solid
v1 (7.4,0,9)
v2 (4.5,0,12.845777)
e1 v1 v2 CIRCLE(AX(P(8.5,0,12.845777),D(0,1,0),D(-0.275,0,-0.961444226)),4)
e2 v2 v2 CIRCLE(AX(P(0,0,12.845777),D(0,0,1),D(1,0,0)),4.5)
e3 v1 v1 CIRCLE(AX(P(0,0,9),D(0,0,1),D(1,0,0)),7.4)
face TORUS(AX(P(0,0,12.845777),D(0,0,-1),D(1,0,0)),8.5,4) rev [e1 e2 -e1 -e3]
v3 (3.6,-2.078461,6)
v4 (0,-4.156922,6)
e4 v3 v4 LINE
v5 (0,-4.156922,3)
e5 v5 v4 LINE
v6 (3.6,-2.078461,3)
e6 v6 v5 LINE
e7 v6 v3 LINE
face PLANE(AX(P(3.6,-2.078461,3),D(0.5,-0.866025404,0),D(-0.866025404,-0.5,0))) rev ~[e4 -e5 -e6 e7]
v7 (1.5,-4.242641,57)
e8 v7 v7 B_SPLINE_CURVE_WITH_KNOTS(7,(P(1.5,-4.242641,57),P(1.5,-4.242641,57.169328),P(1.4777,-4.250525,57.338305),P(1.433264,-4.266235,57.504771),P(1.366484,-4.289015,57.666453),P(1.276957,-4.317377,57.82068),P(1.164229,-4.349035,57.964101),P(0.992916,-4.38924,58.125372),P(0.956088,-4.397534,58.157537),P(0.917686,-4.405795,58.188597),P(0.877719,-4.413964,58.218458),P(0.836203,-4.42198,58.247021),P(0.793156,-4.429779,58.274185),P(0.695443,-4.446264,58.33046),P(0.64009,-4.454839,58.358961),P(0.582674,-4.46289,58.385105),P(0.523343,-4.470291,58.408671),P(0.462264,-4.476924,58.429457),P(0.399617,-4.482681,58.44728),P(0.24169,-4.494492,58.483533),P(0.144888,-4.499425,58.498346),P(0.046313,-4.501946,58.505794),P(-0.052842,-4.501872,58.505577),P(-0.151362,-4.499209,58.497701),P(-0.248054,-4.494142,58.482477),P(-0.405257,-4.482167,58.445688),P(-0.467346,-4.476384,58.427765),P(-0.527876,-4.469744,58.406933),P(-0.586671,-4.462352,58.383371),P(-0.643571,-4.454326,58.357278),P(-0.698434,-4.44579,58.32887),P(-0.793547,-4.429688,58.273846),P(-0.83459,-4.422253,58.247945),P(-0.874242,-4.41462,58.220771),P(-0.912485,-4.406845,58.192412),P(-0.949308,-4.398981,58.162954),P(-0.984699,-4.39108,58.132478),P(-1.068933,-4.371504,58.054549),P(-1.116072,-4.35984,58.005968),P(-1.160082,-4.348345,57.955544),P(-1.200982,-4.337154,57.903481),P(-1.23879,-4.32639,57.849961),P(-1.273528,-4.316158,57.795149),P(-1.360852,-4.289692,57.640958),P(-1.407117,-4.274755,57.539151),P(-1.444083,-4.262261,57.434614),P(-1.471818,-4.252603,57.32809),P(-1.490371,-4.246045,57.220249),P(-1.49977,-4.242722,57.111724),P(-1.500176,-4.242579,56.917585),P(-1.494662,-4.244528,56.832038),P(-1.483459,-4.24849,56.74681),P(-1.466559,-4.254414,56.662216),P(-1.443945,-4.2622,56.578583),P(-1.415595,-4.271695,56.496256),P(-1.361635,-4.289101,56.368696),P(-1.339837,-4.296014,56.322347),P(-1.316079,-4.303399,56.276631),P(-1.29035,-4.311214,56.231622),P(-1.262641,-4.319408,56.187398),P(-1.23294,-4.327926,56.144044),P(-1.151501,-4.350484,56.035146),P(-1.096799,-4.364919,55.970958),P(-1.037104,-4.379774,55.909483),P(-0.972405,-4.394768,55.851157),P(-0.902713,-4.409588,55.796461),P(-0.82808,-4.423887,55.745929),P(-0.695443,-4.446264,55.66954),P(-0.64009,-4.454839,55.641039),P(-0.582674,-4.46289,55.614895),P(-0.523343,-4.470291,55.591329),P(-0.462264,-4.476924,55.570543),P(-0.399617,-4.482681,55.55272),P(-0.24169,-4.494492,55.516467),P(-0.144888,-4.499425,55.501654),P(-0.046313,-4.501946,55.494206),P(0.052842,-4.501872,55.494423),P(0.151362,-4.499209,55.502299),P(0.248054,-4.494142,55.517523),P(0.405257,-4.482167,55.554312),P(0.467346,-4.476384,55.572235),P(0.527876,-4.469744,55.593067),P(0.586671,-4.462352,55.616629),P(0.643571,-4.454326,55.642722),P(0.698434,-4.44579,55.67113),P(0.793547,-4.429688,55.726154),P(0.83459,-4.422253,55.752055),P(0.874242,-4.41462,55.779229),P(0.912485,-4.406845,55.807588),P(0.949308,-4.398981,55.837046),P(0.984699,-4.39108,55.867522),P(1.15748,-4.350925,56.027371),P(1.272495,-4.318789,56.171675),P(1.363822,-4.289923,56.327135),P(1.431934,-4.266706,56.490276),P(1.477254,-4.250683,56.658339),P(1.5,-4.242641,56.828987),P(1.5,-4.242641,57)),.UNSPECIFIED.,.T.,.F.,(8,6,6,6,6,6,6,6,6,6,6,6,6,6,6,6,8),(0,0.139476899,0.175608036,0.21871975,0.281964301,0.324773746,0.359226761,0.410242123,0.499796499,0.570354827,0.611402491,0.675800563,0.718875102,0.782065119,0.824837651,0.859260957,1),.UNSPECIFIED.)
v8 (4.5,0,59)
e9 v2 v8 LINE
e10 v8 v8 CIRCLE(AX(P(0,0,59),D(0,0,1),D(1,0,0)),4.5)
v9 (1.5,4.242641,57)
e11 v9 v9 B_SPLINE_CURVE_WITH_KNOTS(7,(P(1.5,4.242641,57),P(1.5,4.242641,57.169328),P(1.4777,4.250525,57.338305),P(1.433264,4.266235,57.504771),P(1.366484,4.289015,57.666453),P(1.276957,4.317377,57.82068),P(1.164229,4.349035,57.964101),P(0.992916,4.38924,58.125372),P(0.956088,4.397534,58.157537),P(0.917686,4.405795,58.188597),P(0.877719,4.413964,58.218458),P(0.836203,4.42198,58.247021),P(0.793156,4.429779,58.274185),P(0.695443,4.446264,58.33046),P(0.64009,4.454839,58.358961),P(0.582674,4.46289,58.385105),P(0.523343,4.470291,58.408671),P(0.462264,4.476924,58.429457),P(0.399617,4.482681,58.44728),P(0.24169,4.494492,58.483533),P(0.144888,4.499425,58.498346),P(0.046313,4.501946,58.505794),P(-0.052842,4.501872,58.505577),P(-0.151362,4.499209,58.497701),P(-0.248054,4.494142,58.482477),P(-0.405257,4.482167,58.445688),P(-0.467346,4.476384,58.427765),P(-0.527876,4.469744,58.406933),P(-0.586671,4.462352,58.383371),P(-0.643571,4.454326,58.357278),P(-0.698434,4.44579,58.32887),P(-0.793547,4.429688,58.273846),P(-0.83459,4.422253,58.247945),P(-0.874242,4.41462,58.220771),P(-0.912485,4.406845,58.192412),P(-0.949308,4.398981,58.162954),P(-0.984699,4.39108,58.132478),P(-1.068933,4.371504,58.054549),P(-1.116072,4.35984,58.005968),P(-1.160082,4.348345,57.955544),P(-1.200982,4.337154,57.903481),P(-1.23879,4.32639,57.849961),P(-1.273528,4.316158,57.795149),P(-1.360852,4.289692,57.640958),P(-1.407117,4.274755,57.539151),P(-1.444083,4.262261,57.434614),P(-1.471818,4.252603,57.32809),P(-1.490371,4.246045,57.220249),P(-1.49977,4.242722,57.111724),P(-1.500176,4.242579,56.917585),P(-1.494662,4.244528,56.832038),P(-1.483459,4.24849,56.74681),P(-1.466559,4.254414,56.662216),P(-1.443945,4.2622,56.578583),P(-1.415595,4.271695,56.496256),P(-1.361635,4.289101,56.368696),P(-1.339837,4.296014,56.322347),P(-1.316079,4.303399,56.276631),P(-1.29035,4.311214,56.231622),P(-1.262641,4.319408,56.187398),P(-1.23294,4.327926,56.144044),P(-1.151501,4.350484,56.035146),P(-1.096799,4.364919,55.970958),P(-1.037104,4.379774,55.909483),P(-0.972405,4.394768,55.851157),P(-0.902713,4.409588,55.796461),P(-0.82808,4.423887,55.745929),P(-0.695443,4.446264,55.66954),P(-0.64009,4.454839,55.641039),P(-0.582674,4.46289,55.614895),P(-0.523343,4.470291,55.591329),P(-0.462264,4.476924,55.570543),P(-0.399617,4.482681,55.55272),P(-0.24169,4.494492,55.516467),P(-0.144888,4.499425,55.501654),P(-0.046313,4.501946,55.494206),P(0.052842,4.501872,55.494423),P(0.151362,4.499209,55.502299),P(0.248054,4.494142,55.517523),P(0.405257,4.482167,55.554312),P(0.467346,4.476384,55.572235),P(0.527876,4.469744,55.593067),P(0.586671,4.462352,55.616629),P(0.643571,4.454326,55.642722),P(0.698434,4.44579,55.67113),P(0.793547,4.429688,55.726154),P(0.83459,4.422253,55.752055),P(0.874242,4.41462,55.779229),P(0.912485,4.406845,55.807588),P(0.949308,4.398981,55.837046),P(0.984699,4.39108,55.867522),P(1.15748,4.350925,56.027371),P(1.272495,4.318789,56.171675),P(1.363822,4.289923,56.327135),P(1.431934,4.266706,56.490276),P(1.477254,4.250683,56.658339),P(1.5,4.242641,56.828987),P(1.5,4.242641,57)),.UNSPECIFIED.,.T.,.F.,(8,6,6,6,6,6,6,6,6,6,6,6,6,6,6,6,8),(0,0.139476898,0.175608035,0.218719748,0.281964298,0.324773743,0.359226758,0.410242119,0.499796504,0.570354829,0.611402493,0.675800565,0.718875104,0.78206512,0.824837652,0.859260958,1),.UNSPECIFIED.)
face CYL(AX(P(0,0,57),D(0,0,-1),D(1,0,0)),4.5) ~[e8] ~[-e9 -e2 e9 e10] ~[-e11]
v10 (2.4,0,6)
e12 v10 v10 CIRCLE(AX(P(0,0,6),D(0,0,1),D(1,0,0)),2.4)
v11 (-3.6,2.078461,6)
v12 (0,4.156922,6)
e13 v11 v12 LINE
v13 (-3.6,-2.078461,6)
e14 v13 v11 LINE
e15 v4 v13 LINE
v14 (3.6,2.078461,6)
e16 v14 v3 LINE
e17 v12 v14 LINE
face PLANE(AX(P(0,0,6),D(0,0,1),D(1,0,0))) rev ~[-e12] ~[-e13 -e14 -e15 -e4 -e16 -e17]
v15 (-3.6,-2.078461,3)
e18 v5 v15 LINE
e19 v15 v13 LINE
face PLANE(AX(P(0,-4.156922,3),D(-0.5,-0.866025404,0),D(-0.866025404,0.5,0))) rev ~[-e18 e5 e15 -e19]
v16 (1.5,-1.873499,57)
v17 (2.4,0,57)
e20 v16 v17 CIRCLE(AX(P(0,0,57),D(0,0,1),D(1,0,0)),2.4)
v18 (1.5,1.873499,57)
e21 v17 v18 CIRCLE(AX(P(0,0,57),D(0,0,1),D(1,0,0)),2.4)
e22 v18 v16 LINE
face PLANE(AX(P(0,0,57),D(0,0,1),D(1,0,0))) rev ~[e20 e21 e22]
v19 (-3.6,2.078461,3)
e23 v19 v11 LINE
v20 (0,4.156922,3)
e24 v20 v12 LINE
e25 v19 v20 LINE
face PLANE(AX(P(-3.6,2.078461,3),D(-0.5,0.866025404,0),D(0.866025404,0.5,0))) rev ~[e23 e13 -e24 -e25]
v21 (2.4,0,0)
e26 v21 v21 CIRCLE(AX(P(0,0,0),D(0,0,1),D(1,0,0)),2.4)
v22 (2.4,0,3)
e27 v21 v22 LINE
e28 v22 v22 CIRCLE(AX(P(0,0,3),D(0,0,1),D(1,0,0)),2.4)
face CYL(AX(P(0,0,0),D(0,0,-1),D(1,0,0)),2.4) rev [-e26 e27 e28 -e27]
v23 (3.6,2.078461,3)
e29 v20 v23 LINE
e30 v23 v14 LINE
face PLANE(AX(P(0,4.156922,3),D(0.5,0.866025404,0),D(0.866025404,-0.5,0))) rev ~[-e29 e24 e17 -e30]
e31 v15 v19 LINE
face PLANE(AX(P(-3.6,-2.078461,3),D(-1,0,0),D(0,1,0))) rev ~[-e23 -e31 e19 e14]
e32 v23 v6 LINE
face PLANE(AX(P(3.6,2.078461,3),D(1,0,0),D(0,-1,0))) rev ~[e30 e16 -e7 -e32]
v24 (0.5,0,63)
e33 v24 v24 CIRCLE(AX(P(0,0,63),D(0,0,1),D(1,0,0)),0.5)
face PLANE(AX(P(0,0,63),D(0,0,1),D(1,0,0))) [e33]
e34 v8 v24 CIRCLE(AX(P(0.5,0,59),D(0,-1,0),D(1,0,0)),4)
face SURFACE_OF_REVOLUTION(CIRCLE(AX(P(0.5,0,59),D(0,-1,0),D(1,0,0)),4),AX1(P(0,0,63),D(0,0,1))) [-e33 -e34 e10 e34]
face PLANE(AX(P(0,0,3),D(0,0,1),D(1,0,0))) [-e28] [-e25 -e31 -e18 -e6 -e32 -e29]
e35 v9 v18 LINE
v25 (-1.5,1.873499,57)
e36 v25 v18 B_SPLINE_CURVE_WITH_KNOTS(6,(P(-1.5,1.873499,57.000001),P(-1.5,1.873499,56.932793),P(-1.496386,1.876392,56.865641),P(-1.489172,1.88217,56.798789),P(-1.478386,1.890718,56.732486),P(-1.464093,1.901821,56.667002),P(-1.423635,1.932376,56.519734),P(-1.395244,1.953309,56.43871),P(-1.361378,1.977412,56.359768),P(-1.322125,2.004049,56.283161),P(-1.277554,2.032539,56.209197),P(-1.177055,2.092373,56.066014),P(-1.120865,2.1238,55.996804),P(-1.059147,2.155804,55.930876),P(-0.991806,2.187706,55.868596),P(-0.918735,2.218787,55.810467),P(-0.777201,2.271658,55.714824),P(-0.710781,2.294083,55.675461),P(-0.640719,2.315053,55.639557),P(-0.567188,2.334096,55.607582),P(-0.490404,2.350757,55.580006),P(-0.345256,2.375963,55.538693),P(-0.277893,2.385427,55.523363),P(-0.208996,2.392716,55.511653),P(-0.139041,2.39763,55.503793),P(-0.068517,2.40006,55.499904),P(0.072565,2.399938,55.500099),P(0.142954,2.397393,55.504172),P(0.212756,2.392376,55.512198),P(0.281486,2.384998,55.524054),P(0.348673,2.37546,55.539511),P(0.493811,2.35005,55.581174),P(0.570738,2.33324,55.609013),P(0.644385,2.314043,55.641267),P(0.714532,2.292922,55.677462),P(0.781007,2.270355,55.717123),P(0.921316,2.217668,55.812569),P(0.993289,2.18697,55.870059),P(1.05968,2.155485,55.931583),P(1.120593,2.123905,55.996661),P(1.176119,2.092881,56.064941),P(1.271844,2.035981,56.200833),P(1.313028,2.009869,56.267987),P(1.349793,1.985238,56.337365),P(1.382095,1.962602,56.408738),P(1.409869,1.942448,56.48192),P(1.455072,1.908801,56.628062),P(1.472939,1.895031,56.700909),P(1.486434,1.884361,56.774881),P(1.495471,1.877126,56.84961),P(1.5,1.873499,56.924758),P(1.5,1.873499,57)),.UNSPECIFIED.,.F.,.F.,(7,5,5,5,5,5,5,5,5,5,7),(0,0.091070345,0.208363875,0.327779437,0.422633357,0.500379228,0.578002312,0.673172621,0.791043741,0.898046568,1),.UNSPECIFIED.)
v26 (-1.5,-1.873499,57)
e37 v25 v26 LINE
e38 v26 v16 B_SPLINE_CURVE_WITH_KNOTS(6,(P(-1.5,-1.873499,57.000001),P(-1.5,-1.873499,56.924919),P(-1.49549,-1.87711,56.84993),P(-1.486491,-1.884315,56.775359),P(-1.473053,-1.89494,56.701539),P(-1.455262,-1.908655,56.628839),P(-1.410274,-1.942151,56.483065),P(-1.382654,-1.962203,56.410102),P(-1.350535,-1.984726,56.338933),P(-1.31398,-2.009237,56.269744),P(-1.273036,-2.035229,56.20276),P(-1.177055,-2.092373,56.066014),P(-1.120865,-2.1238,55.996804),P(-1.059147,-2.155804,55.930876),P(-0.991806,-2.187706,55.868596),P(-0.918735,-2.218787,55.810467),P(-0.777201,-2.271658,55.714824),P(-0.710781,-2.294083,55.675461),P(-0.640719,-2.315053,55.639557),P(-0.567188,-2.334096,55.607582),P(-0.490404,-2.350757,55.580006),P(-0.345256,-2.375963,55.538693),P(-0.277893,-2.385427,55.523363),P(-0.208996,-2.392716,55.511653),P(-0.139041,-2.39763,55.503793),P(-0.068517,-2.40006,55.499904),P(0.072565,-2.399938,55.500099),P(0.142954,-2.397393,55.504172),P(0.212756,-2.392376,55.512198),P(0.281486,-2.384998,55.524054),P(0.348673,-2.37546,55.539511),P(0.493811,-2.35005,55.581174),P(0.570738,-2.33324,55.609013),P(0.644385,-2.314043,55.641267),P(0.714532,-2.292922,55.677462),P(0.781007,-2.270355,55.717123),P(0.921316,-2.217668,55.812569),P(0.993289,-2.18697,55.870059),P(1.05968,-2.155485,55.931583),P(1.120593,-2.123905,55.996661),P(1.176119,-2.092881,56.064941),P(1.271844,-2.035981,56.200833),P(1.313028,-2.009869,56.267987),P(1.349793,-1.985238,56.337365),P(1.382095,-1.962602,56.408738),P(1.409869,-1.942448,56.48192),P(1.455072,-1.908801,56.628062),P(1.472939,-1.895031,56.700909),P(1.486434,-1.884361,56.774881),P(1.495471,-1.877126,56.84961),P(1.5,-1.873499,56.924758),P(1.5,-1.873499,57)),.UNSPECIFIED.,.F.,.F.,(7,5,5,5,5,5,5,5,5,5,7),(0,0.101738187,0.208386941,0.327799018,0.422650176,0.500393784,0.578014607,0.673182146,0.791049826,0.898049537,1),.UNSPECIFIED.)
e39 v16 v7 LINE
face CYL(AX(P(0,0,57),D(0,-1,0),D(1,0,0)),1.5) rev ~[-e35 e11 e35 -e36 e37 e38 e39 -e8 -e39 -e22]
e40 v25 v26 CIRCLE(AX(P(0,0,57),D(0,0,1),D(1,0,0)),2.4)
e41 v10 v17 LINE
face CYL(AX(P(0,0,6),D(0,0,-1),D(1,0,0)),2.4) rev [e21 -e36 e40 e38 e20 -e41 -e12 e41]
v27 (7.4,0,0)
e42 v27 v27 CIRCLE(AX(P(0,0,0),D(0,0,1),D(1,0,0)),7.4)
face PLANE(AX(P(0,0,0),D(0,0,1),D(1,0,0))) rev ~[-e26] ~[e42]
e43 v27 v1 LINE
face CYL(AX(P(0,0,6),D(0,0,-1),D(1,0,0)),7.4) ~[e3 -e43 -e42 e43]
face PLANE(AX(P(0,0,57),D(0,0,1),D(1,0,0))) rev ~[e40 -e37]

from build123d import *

# Parameters (mm, degrees)
F0_R      = 7.4
F0_R_2    = 2.4
F1_DEPTH  = 3
F2_R      = 7.4
F3_DEPTH  = 3
F4_R      = 4.5
F4_R_2    = 2.4
F5_DEPTH  = 51
F6_DEPTH  = 3
F7_R      = 4.5
F8_DEPTH  = 6
F10_R     = 1.5
F11_DEPTH = 12.5


# Not quite as in the source:
# - a fillet or chamfer that OpenCascade refuses, or shapes differently, is made with other operations: its cross-section is extruded or revolved along the edge and cut away or added


with BuildPart() as f1:
    # F0 (on Top) → F1 (new body)
    with BuildSketch(Plane.XY):
        Circle(F0_R)
        Circle(F0_R_2, mode=Mode.SUBTRACT)
    extrude(amount=F1_DEPTH)

    # F2 (on face) → F3 (join)
    with BuildSketch(Plane.XY.offset(3)):
        Circle(F2_R)
        Polygon((0, 4.1569219382), (3.6, 2.0784609691), (3.6, -2.0784609691), (0, -4.1569219382), (-3.6, -2.0784609691), (-3.6, 2.0784609691), align=None, mode=Mode.SUBTRACT)
    extrude(amount=F3_DEPTH)

    # F4 (on face) → F5 (join)
    with BuildSketch(Plane.XY.offset(6)):
        Circle(F4_R)
        Polygon((-3.6, -2.0784609691), (-3.6, 2.0784609691), (0, 4.1569219382), (3.6, 2.0784609691), (3.6, -2.0784609691), (0, -4.1569219382), align=None, mode=Mode.SUBTRACT)
        Polygon((0, 4.1569219382), (-3.6, 2.0784609691), (-3.6, -2.0784609691), (0, -4.1569219382), (3.6, -2.0784609691), (3.6, 2.0784609691), align=None)
        Circle(F4_R_2, mode=Mode.SUBTRACT)
    extrude(amount=F5_DEPTH)

    # F6 (add): a face of the model
    f6_faces = [f1.faces().sort_by_distance(p)[0] for p in [
        (-7.1906963928, 0, 6),
    ]]
    extrude(f6_faces, amount=F6_DEPTH)

    # F7 (on face) → F8 (join)
    with BuildSketch(Plane.XY.offset(57)):
        Circle(F7_R)
    extrude(amount=F8_DEPTH)

    # F9: fillet of radius 4 on 2 edges, made by hand

    # F9_s1 → F9_t2 (revolve)
    with BuildSketch(Plane.XZ):
        with BuildLine():
            ThreePointArc((7.4, 9), (5.3062561155, 10.4374579888), (4.5, 12.8457769046))
            Line((4.5, 12.8457769046), (4.5, 9))
            Line((4.5, 9), (7.4, 9))
        make_face()
    revolve(axis=Axis((0, 0, 9), (0, 0, 1)))

    # F9_s3 → F9_t4 (revolve, cut)
    with BuildSketch(Plane.XZ):
        with BuildLine():
            ThreePointArc((4.5, 59), (3.3284271247, 61.8284271247), (0.5, 63))
            Line((0.5, 63), (4.5, 63))
            Line((4.5, 63), (4.5, 59))
        make_face()
    revolve(axis=Axis((0, 0, 63), (0, 0, 1)), mode=Mode.SUBTRACT)

    # F10 (on Front) → F11 (cut, symmetric)
    with BuildSketch(Plane.XZ):
        with Locations((0, 57)):
            Circle(F10_R)
    extrude(amount=F11_DEPTH, both=True, mode=Mode.SUBTRACT)


solid = f1.part
